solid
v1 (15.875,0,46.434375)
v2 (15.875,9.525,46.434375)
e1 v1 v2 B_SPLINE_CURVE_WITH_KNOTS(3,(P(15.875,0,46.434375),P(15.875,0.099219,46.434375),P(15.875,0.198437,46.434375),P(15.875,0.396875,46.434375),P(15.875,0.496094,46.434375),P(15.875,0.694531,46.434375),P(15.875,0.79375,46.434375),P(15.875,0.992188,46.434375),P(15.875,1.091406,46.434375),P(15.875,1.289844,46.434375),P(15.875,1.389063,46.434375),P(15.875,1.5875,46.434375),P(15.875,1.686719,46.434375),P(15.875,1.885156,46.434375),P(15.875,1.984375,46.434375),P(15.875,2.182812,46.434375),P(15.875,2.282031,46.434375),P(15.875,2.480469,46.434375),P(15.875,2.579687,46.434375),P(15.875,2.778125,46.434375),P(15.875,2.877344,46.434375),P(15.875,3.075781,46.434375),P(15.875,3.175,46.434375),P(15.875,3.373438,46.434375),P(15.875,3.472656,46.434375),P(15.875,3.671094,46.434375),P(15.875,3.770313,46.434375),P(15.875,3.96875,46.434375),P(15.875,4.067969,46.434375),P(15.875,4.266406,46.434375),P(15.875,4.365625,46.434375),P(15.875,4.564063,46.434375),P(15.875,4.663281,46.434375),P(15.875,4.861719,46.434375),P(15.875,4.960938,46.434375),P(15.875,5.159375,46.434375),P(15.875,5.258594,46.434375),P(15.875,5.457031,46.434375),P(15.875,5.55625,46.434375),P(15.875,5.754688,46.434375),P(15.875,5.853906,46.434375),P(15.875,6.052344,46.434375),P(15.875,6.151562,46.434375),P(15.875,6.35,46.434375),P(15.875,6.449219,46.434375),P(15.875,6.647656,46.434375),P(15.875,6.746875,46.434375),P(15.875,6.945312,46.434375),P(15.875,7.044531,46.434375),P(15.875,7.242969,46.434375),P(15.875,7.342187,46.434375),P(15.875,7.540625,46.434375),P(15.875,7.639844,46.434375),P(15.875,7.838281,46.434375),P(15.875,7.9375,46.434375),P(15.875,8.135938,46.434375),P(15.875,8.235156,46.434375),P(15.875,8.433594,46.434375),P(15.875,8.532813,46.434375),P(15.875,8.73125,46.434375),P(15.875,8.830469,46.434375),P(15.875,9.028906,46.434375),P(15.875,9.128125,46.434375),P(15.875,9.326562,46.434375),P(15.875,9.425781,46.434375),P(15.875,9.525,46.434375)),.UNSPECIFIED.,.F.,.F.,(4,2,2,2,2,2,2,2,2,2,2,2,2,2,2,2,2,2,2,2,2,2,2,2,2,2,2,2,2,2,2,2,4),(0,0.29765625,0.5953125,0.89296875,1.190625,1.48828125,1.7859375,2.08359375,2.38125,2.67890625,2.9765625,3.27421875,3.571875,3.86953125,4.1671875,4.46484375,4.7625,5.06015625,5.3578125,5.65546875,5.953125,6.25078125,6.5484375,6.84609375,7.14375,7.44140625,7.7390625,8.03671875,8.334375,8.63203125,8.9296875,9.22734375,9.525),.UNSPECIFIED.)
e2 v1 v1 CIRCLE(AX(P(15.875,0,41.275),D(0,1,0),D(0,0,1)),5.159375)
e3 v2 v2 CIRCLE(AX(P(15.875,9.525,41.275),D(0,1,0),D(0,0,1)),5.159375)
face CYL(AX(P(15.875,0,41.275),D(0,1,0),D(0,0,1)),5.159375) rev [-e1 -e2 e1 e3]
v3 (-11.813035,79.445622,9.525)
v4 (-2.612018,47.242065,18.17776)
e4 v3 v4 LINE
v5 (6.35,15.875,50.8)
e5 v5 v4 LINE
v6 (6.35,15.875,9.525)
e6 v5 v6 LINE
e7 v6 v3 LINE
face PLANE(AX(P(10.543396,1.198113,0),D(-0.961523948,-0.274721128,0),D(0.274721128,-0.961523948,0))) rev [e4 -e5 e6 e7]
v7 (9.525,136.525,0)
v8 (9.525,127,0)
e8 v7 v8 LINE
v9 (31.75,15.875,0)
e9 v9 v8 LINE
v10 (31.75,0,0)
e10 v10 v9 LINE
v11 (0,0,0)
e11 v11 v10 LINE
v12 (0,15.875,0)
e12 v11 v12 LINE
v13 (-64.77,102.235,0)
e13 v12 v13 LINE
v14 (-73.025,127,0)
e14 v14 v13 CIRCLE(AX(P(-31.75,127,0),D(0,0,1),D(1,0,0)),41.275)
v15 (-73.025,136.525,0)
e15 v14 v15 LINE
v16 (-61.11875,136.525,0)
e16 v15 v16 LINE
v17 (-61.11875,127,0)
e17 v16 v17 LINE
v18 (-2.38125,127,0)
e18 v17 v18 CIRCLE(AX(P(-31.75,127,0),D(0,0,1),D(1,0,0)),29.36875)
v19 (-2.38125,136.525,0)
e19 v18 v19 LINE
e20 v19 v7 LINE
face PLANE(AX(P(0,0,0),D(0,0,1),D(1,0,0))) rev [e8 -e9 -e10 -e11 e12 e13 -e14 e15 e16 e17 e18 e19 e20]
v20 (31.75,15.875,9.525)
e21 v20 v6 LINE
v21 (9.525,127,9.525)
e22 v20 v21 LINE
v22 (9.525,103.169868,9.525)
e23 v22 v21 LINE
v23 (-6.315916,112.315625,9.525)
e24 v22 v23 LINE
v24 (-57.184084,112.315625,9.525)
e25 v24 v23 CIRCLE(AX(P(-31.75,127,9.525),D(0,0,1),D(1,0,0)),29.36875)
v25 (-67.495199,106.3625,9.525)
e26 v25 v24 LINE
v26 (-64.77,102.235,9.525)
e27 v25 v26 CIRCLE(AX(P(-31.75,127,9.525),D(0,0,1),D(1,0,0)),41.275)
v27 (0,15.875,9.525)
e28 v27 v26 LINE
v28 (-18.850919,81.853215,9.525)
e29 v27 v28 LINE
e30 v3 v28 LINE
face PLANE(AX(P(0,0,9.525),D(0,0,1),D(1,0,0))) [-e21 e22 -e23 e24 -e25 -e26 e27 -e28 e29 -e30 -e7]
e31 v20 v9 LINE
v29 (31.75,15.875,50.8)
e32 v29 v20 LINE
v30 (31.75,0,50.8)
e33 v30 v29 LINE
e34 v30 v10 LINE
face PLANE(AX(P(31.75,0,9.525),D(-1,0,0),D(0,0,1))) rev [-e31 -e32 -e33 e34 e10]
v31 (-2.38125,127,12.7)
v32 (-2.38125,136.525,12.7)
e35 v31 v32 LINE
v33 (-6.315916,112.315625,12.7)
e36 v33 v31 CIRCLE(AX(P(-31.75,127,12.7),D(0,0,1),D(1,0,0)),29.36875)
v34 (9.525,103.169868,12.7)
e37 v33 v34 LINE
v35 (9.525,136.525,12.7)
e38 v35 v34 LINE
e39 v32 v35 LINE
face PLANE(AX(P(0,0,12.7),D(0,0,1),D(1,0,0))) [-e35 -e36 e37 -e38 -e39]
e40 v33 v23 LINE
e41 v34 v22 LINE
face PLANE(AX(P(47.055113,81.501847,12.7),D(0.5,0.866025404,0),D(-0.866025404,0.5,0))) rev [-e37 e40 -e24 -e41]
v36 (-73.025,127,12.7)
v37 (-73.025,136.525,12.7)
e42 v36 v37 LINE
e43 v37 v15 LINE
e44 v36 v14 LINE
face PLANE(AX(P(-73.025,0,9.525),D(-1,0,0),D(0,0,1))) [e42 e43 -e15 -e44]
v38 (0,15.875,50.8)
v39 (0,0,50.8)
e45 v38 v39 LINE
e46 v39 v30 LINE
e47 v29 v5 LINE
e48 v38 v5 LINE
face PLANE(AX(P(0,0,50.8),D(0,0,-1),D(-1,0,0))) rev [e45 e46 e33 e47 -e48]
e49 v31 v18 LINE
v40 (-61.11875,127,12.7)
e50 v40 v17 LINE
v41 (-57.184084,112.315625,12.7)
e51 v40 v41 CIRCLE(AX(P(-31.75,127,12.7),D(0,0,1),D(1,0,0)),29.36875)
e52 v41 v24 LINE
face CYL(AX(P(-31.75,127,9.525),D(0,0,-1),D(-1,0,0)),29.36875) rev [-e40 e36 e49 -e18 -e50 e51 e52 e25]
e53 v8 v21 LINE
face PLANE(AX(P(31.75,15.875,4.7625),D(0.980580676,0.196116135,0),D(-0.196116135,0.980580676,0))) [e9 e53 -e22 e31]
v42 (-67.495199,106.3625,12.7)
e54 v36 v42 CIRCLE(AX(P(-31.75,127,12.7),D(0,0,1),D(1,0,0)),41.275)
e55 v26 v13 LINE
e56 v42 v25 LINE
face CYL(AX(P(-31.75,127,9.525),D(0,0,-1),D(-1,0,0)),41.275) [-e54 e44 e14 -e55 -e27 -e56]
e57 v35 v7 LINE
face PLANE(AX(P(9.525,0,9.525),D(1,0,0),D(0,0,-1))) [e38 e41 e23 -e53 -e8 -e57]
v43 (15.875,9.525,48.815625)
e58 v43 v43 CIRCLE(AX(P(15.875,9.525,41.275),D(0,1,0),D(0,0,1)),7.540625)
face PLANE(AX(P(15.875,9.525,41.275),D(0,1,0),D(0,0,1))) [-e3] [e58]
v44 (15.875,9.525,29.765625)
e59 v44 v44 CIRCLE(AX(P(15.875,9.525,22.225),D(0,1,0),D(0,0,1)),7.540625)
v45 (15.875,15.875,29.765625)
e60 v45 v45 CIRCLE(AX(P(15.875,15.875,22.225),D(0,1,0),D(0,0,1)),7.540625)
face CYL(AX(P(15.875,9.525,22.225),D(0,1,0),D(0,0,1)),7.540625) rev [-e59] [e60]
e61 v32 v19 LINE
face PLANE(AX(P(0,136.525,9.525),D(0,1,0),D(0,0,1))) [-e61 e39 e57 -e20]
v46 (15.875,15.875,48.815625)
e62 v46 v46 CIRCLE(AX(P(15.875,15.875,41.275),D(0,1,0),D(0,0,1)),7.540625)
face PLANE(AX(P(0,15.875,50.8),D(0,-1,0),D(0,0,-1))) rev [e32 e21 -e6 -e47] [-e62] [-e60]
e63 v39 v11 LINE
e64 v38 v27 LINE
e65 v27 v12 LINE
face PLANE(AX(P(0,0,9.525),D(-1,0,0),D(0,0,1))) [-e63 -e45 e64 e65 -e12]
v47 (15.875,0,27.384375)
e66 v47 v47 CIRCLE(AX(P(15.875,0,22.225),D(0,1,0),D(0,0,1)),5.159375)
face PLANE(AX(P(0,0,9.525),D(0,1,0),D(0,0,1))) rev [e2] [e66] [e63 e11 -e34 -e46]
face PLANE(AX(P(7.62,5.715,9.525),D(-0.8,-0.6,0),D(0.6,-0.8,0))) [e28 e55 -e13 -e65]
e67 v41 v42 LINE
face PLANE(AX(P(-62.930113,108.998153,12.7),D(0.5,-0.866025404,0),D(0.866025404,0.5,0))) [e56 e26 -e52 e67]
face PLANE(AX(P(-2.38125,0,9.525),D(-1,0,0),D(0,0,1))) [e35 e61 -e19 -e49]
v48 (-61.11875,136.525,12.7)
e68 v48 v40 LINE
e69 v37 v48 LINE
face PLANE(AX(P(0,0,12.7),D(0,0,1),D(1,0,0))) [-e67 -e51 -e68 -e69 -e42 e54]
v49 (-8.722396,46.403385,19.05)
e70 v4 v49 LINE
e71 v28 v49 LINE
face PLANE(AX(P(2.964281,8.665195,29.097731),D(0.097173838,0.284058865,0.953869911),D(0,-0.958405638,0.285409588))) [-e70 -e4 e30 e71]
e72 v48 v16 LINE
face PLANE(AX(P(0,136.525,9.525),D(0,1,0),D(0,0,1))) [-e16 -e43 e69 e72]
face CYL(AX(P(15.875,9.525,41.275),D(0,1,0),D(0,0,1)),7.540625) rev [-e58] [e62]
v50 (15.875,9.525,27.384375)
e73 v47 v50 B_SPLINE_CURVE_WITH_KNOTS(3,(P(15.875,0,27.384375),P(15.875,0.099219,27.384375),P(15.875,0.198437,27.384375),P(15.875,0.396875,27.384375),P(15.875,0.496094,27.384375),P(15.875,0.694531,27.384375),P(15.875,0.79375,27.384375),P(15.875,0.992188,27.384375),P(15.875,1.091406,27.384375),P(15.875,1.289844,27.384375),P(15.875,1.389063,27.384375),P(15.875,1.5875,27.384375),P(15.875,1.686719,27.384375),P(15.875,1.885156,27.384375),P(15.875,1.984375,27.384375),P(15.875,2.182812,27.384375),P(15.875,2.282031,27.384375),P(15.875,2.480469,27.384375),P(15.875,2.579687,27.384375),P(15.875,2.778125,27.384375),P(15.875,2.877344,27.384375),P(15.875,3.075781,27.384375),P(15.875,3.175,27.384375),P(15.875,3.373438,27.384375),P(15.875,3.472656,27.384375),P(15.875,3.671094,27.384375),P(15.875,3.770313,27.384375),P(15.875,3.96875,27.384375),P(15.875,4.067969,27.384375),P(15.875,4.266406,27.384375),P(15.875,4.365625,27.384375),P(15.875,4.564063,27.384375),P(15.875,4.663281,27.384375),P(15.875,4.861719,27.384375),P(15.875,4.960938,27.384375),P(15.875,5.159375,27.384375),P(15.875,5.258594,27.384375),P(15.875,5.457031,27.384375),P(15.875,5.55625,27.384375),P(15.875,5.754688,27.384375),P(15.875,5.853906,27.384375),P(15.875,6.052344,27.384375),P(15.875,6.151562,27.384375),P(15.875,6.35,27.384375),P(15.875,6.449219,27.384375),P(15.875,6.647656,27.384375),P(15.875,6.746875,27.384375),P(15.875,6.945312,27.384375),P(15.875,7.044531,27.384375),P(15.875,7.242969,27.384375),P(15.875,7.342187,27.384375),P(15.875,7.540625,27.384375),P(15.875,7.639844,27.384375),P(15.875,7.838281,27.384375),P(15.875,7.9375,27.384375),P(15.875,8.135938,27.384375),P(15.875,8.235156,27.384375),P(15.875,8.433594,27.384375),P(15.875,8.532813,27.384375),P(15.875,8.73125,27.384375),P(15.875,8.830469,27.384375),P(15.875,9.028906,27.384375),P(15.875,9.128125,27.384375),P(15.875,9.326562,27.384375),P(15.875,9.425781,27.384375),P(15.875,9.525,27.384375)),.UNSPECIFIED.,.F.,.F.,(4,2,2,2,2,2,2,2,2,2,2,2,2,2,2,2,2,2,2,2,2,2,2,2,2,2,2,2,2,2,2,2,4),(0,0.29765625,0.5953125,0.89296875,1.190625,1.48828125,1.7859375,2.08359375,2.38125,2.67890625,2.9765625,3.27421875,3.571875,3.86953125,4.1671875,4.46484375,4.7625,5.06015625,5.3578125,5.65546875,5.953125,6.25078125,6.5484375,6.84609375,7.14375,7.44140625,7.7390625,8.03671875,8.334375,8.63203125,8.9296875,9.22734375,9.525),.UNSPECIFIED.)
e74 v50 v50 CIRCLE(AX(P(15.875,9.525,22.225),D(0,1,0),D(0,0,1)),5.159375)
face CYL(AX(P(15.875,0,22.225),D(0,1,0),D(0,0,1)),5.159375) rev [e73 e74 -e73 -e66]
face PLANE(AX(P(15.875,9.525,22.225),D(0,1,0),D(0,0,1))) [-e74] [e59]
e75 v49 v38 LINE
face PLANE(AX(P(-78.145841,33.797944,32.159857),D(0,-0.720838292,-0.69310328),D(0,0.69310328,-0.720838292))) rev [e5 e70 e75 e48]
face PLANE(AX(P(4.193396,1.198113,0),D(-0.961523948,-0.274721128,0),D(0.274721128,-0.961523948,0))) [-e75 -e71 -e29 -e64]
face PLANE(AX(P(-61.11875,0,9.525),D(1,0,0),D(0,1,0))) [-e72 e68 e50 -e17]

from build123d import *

# Parameters (mm, degrees)
BOSS_EXTRUDE1_DEPTH = 9.525
RIB1_REACH          = 156.901
SKETCH3_WALL_W      = 425.12827586
SKETCH3_WALL_H      = 9.525
BOSS_EXTRUDE2_DEPTH = 12.7
SKETCH4_W           = 31.75
SKETCH4_H           = 15.875
BOSS_EXTRUDE3_DEPTH = 41.275
SKETCH10_W          = 41.275
SKETCH10_H          = 68.618379108
BOSS_EXTRUDE4_DEPTH = 6.35
CUT_EXTRUDE5_DEPTH  = 173.025545539
SKETCH14_R          = 7.540625
CUT_EXTRUDE6_DEPTH  = 6.35
SKETCH15_R          = 5.159375
CUT_EXTRUDE7_DEPTH  = 156.055766211


with BuildPart() as part:
    # Sketch1 → Boss-Extrude1 (new body)
    with BuildSketch(Plane.XY):
        with BuildLine():
            Line((0, 15.875), (0, 0))
            Line((0, 0), (31.75, 0))
            Line((31.75, 0), (31.75, 15.875))
            Line((31.75, 15.875), (9.525, 15.875))
            Line((9.525, 15.875), (9.525, 136.525))
            Line((9.525, 136.525), (-2.38125, 136.525))
            Line((-2.38125, 136.525), (-2.38125, 127))
            ThreePointArc((-2.38125, 127), (-31.75, 97.63125), (-61.11875, 127))
            Line((-61.11875, 127), (-61.11875, 136.525))
            Line((-61.11875, 136.525), (-73.025, 136.525))
            Line((-73.025, 136.525), (-73.025, 127))
            ThreePointArc((-73.025, 127), (-70.906903127, 113.947698958), (-64.77, 102.235))
            Line((-64.77, 102.235), (0, 15.875))
        make_face()
    extrude(amount=BOSS_EXTRUDE1_DEPTH)

    # Sketch3 wall → Rib1 (add, up to next)
    with BuildSketch(Plane(origin=(20.6375, 71.4375, 4.7625), x_dir=(-0.196116135138, 0.980580675691, 0), z_dir=(-0.980580675691, -0.196116135138, 0)), mode=Mode.PRIVATE) as rib1_sk1:
        Rectangle(SKETCH3_WALL_W, SKETCH3_WALL_H)
    rib1_tool1 = extrude(rib1_sk1.sketch, amount=RIB1_REACH, mode=Mode.PRIVATE) - part.part
    add(rib1_tool1.solids().sort_by_distance((20.6375, 71.4375, 4.7625))[0])

    # Sketch1<3> → Boss-Extrude2 (add)
    with BuildSketch(Plane.XY):
        with BuildLine():
            ThreePointArc((-73.025, 127), (-71.61858848, 116.317243913), (-67.495198541, 106.3625))
            Line((-67.495198541, 106.3625), (-57.184083577, 112.315625))
            ThreePointArc((-57.184083577, 112.315625), (-60.118034111, 119.398808169), (-61.11875, 127))
            Line((-61.11875, 127), (-61.11875, 136.525))
            Line((-61.11875, 136.525), (-73.025, 136.525))
            Line((-73.025, 136.525), (-73.025, 127))
        make_face()
        with BuildLine():
            Line((-6.315916423, 112.315625), (9.525, 103.169867639))
            Line((9.525, 103.169867639), (9.525, 136.525))
            Line((9.525, 136.525), (-2.38125, 136.525))
            Line((-2.38125, 136.525), (-2.38125, 127))
            ThreePointArc((-2.38125, 127), (-3.381965889, 119.398808169), (-6.315916423, 112.315625))
        make_face()
    extrude(amount=BOSS_EXTRUDE2_DEPTH)

    # Sketch4 → Boss-Extrude3 (add)
    with BuildSketch(Plane.XY.offset(9.525)):
        with Locations((15.875, 7.9375)):
            Rectangle(SKETCH4_W, SKETCH4_H)
    extrude(amount=BOSS_EXTRUDE3_DEPTH)

    # Sketch10 → Boss-Extrude4 (add, along a direction that is not the sketch's normal)
    with BuildSketch(Plane(origin=(4.193396226, 1.198113208, 0), x_dir=(0, 0, -1), z_dir=(0.9615239476408233, 0.2747211278973781, 0))):
        with Locations((-30.1625, 49.573382223)):
            Rectangle(SKETCH10_W, SKETCH10_H)
    extrude(amount=BOSS_EXTRUDE4_DEPTH, dir=(1, 0, 0))

    # Sketch11 → Cut-Extrude5 (cut, through all, along a direction that is not the sketch's normal)
    with BuildSketch(Plane(origin=(10.064150943, 2.875471698, 0), x_dir=(0, 0, -1), z_dir=(0.9615239476408232, 0.27472112789737807, 0))):
        Polygon((-50.8, 82.138092614), (-50.8, 13.519713507), (-19.05, 45.269713507), (-9.525, 54.794713507), (-9.525, 82.138092614), align=None)
    extrude(amount=-CUT_EXTRUDE5_DEPTH, dir=(1, 0, 0), mode=Mode.SUBTRACT)

    # Sketch13 → Loft2 section 0
    with BuildSketch(Plane(origin=(10.064150943, 2.875471698, 0), x_dir=(0, 0, -1), z_dir=(0.9615239476408232, 0.27472112789737807, 0))):
        with BuildLine():
            Line((-18.177760419, 46.141953088), (-8.652760419, 83.010332195))
            Line((-8.652760419, 83.010332195), (-9.525, 54.794713507))
            Line((-9.525, 54.794713507), (-18.177760419, 46.141953088))
        make_face()
    # Sketch12 → Loft2 section 1
    with BuildSketch(Plane(origin=(4.193396226, 1.198113208, 0), x_dir=(0, 0, -1), z_dir=(0.9615239476408233, 0.2747211278973781, 0))):
        with BuildLine():
            Line((-19.05, 47.014192669), (-9.525, 83.882571777))
            Line((-9.525, 83.882571777), (-9.525, 56.539192669))
            Line((-9.525, 56.539192669), (-19.05, 47.014192669))
        make_face()
    loft()

    # Sketch14 → Cut-Extrude6 (cut)
    with BuildSketch(Plane(origin=(0, 15.875, 0), x_dir=(1, 0, 0), z_dir=(0, 1, 0))):
        with Locations((15.875, -41.275)):
            Circle(SKETCH14_R)
        with Locations((15.875, -22.225)):
            Circle(SKETCH14_R)
    extrude(amount=-CUT_EXTRUDE6_DEPTH, mode=Mode.SUBTRACT)

    # Sketch15 → Cut-Extrude7 (cut, through all)
    with BuildSketch(Plane(origin=(0, 9.525, 0), x_dir=(1, 0, 0), z_dir=(0, 1, 0))):
        with Locations((15.875, -22.225)):
            Circle(SKETCH15_R)
        with Locations((15.875, -41.275)):
            Circle(SKETCH15_R)
    extrude(amount=-CUT_EXTRUDE7_DEPTH, mode=Mode.SUBTRACT)


solid = part.part
